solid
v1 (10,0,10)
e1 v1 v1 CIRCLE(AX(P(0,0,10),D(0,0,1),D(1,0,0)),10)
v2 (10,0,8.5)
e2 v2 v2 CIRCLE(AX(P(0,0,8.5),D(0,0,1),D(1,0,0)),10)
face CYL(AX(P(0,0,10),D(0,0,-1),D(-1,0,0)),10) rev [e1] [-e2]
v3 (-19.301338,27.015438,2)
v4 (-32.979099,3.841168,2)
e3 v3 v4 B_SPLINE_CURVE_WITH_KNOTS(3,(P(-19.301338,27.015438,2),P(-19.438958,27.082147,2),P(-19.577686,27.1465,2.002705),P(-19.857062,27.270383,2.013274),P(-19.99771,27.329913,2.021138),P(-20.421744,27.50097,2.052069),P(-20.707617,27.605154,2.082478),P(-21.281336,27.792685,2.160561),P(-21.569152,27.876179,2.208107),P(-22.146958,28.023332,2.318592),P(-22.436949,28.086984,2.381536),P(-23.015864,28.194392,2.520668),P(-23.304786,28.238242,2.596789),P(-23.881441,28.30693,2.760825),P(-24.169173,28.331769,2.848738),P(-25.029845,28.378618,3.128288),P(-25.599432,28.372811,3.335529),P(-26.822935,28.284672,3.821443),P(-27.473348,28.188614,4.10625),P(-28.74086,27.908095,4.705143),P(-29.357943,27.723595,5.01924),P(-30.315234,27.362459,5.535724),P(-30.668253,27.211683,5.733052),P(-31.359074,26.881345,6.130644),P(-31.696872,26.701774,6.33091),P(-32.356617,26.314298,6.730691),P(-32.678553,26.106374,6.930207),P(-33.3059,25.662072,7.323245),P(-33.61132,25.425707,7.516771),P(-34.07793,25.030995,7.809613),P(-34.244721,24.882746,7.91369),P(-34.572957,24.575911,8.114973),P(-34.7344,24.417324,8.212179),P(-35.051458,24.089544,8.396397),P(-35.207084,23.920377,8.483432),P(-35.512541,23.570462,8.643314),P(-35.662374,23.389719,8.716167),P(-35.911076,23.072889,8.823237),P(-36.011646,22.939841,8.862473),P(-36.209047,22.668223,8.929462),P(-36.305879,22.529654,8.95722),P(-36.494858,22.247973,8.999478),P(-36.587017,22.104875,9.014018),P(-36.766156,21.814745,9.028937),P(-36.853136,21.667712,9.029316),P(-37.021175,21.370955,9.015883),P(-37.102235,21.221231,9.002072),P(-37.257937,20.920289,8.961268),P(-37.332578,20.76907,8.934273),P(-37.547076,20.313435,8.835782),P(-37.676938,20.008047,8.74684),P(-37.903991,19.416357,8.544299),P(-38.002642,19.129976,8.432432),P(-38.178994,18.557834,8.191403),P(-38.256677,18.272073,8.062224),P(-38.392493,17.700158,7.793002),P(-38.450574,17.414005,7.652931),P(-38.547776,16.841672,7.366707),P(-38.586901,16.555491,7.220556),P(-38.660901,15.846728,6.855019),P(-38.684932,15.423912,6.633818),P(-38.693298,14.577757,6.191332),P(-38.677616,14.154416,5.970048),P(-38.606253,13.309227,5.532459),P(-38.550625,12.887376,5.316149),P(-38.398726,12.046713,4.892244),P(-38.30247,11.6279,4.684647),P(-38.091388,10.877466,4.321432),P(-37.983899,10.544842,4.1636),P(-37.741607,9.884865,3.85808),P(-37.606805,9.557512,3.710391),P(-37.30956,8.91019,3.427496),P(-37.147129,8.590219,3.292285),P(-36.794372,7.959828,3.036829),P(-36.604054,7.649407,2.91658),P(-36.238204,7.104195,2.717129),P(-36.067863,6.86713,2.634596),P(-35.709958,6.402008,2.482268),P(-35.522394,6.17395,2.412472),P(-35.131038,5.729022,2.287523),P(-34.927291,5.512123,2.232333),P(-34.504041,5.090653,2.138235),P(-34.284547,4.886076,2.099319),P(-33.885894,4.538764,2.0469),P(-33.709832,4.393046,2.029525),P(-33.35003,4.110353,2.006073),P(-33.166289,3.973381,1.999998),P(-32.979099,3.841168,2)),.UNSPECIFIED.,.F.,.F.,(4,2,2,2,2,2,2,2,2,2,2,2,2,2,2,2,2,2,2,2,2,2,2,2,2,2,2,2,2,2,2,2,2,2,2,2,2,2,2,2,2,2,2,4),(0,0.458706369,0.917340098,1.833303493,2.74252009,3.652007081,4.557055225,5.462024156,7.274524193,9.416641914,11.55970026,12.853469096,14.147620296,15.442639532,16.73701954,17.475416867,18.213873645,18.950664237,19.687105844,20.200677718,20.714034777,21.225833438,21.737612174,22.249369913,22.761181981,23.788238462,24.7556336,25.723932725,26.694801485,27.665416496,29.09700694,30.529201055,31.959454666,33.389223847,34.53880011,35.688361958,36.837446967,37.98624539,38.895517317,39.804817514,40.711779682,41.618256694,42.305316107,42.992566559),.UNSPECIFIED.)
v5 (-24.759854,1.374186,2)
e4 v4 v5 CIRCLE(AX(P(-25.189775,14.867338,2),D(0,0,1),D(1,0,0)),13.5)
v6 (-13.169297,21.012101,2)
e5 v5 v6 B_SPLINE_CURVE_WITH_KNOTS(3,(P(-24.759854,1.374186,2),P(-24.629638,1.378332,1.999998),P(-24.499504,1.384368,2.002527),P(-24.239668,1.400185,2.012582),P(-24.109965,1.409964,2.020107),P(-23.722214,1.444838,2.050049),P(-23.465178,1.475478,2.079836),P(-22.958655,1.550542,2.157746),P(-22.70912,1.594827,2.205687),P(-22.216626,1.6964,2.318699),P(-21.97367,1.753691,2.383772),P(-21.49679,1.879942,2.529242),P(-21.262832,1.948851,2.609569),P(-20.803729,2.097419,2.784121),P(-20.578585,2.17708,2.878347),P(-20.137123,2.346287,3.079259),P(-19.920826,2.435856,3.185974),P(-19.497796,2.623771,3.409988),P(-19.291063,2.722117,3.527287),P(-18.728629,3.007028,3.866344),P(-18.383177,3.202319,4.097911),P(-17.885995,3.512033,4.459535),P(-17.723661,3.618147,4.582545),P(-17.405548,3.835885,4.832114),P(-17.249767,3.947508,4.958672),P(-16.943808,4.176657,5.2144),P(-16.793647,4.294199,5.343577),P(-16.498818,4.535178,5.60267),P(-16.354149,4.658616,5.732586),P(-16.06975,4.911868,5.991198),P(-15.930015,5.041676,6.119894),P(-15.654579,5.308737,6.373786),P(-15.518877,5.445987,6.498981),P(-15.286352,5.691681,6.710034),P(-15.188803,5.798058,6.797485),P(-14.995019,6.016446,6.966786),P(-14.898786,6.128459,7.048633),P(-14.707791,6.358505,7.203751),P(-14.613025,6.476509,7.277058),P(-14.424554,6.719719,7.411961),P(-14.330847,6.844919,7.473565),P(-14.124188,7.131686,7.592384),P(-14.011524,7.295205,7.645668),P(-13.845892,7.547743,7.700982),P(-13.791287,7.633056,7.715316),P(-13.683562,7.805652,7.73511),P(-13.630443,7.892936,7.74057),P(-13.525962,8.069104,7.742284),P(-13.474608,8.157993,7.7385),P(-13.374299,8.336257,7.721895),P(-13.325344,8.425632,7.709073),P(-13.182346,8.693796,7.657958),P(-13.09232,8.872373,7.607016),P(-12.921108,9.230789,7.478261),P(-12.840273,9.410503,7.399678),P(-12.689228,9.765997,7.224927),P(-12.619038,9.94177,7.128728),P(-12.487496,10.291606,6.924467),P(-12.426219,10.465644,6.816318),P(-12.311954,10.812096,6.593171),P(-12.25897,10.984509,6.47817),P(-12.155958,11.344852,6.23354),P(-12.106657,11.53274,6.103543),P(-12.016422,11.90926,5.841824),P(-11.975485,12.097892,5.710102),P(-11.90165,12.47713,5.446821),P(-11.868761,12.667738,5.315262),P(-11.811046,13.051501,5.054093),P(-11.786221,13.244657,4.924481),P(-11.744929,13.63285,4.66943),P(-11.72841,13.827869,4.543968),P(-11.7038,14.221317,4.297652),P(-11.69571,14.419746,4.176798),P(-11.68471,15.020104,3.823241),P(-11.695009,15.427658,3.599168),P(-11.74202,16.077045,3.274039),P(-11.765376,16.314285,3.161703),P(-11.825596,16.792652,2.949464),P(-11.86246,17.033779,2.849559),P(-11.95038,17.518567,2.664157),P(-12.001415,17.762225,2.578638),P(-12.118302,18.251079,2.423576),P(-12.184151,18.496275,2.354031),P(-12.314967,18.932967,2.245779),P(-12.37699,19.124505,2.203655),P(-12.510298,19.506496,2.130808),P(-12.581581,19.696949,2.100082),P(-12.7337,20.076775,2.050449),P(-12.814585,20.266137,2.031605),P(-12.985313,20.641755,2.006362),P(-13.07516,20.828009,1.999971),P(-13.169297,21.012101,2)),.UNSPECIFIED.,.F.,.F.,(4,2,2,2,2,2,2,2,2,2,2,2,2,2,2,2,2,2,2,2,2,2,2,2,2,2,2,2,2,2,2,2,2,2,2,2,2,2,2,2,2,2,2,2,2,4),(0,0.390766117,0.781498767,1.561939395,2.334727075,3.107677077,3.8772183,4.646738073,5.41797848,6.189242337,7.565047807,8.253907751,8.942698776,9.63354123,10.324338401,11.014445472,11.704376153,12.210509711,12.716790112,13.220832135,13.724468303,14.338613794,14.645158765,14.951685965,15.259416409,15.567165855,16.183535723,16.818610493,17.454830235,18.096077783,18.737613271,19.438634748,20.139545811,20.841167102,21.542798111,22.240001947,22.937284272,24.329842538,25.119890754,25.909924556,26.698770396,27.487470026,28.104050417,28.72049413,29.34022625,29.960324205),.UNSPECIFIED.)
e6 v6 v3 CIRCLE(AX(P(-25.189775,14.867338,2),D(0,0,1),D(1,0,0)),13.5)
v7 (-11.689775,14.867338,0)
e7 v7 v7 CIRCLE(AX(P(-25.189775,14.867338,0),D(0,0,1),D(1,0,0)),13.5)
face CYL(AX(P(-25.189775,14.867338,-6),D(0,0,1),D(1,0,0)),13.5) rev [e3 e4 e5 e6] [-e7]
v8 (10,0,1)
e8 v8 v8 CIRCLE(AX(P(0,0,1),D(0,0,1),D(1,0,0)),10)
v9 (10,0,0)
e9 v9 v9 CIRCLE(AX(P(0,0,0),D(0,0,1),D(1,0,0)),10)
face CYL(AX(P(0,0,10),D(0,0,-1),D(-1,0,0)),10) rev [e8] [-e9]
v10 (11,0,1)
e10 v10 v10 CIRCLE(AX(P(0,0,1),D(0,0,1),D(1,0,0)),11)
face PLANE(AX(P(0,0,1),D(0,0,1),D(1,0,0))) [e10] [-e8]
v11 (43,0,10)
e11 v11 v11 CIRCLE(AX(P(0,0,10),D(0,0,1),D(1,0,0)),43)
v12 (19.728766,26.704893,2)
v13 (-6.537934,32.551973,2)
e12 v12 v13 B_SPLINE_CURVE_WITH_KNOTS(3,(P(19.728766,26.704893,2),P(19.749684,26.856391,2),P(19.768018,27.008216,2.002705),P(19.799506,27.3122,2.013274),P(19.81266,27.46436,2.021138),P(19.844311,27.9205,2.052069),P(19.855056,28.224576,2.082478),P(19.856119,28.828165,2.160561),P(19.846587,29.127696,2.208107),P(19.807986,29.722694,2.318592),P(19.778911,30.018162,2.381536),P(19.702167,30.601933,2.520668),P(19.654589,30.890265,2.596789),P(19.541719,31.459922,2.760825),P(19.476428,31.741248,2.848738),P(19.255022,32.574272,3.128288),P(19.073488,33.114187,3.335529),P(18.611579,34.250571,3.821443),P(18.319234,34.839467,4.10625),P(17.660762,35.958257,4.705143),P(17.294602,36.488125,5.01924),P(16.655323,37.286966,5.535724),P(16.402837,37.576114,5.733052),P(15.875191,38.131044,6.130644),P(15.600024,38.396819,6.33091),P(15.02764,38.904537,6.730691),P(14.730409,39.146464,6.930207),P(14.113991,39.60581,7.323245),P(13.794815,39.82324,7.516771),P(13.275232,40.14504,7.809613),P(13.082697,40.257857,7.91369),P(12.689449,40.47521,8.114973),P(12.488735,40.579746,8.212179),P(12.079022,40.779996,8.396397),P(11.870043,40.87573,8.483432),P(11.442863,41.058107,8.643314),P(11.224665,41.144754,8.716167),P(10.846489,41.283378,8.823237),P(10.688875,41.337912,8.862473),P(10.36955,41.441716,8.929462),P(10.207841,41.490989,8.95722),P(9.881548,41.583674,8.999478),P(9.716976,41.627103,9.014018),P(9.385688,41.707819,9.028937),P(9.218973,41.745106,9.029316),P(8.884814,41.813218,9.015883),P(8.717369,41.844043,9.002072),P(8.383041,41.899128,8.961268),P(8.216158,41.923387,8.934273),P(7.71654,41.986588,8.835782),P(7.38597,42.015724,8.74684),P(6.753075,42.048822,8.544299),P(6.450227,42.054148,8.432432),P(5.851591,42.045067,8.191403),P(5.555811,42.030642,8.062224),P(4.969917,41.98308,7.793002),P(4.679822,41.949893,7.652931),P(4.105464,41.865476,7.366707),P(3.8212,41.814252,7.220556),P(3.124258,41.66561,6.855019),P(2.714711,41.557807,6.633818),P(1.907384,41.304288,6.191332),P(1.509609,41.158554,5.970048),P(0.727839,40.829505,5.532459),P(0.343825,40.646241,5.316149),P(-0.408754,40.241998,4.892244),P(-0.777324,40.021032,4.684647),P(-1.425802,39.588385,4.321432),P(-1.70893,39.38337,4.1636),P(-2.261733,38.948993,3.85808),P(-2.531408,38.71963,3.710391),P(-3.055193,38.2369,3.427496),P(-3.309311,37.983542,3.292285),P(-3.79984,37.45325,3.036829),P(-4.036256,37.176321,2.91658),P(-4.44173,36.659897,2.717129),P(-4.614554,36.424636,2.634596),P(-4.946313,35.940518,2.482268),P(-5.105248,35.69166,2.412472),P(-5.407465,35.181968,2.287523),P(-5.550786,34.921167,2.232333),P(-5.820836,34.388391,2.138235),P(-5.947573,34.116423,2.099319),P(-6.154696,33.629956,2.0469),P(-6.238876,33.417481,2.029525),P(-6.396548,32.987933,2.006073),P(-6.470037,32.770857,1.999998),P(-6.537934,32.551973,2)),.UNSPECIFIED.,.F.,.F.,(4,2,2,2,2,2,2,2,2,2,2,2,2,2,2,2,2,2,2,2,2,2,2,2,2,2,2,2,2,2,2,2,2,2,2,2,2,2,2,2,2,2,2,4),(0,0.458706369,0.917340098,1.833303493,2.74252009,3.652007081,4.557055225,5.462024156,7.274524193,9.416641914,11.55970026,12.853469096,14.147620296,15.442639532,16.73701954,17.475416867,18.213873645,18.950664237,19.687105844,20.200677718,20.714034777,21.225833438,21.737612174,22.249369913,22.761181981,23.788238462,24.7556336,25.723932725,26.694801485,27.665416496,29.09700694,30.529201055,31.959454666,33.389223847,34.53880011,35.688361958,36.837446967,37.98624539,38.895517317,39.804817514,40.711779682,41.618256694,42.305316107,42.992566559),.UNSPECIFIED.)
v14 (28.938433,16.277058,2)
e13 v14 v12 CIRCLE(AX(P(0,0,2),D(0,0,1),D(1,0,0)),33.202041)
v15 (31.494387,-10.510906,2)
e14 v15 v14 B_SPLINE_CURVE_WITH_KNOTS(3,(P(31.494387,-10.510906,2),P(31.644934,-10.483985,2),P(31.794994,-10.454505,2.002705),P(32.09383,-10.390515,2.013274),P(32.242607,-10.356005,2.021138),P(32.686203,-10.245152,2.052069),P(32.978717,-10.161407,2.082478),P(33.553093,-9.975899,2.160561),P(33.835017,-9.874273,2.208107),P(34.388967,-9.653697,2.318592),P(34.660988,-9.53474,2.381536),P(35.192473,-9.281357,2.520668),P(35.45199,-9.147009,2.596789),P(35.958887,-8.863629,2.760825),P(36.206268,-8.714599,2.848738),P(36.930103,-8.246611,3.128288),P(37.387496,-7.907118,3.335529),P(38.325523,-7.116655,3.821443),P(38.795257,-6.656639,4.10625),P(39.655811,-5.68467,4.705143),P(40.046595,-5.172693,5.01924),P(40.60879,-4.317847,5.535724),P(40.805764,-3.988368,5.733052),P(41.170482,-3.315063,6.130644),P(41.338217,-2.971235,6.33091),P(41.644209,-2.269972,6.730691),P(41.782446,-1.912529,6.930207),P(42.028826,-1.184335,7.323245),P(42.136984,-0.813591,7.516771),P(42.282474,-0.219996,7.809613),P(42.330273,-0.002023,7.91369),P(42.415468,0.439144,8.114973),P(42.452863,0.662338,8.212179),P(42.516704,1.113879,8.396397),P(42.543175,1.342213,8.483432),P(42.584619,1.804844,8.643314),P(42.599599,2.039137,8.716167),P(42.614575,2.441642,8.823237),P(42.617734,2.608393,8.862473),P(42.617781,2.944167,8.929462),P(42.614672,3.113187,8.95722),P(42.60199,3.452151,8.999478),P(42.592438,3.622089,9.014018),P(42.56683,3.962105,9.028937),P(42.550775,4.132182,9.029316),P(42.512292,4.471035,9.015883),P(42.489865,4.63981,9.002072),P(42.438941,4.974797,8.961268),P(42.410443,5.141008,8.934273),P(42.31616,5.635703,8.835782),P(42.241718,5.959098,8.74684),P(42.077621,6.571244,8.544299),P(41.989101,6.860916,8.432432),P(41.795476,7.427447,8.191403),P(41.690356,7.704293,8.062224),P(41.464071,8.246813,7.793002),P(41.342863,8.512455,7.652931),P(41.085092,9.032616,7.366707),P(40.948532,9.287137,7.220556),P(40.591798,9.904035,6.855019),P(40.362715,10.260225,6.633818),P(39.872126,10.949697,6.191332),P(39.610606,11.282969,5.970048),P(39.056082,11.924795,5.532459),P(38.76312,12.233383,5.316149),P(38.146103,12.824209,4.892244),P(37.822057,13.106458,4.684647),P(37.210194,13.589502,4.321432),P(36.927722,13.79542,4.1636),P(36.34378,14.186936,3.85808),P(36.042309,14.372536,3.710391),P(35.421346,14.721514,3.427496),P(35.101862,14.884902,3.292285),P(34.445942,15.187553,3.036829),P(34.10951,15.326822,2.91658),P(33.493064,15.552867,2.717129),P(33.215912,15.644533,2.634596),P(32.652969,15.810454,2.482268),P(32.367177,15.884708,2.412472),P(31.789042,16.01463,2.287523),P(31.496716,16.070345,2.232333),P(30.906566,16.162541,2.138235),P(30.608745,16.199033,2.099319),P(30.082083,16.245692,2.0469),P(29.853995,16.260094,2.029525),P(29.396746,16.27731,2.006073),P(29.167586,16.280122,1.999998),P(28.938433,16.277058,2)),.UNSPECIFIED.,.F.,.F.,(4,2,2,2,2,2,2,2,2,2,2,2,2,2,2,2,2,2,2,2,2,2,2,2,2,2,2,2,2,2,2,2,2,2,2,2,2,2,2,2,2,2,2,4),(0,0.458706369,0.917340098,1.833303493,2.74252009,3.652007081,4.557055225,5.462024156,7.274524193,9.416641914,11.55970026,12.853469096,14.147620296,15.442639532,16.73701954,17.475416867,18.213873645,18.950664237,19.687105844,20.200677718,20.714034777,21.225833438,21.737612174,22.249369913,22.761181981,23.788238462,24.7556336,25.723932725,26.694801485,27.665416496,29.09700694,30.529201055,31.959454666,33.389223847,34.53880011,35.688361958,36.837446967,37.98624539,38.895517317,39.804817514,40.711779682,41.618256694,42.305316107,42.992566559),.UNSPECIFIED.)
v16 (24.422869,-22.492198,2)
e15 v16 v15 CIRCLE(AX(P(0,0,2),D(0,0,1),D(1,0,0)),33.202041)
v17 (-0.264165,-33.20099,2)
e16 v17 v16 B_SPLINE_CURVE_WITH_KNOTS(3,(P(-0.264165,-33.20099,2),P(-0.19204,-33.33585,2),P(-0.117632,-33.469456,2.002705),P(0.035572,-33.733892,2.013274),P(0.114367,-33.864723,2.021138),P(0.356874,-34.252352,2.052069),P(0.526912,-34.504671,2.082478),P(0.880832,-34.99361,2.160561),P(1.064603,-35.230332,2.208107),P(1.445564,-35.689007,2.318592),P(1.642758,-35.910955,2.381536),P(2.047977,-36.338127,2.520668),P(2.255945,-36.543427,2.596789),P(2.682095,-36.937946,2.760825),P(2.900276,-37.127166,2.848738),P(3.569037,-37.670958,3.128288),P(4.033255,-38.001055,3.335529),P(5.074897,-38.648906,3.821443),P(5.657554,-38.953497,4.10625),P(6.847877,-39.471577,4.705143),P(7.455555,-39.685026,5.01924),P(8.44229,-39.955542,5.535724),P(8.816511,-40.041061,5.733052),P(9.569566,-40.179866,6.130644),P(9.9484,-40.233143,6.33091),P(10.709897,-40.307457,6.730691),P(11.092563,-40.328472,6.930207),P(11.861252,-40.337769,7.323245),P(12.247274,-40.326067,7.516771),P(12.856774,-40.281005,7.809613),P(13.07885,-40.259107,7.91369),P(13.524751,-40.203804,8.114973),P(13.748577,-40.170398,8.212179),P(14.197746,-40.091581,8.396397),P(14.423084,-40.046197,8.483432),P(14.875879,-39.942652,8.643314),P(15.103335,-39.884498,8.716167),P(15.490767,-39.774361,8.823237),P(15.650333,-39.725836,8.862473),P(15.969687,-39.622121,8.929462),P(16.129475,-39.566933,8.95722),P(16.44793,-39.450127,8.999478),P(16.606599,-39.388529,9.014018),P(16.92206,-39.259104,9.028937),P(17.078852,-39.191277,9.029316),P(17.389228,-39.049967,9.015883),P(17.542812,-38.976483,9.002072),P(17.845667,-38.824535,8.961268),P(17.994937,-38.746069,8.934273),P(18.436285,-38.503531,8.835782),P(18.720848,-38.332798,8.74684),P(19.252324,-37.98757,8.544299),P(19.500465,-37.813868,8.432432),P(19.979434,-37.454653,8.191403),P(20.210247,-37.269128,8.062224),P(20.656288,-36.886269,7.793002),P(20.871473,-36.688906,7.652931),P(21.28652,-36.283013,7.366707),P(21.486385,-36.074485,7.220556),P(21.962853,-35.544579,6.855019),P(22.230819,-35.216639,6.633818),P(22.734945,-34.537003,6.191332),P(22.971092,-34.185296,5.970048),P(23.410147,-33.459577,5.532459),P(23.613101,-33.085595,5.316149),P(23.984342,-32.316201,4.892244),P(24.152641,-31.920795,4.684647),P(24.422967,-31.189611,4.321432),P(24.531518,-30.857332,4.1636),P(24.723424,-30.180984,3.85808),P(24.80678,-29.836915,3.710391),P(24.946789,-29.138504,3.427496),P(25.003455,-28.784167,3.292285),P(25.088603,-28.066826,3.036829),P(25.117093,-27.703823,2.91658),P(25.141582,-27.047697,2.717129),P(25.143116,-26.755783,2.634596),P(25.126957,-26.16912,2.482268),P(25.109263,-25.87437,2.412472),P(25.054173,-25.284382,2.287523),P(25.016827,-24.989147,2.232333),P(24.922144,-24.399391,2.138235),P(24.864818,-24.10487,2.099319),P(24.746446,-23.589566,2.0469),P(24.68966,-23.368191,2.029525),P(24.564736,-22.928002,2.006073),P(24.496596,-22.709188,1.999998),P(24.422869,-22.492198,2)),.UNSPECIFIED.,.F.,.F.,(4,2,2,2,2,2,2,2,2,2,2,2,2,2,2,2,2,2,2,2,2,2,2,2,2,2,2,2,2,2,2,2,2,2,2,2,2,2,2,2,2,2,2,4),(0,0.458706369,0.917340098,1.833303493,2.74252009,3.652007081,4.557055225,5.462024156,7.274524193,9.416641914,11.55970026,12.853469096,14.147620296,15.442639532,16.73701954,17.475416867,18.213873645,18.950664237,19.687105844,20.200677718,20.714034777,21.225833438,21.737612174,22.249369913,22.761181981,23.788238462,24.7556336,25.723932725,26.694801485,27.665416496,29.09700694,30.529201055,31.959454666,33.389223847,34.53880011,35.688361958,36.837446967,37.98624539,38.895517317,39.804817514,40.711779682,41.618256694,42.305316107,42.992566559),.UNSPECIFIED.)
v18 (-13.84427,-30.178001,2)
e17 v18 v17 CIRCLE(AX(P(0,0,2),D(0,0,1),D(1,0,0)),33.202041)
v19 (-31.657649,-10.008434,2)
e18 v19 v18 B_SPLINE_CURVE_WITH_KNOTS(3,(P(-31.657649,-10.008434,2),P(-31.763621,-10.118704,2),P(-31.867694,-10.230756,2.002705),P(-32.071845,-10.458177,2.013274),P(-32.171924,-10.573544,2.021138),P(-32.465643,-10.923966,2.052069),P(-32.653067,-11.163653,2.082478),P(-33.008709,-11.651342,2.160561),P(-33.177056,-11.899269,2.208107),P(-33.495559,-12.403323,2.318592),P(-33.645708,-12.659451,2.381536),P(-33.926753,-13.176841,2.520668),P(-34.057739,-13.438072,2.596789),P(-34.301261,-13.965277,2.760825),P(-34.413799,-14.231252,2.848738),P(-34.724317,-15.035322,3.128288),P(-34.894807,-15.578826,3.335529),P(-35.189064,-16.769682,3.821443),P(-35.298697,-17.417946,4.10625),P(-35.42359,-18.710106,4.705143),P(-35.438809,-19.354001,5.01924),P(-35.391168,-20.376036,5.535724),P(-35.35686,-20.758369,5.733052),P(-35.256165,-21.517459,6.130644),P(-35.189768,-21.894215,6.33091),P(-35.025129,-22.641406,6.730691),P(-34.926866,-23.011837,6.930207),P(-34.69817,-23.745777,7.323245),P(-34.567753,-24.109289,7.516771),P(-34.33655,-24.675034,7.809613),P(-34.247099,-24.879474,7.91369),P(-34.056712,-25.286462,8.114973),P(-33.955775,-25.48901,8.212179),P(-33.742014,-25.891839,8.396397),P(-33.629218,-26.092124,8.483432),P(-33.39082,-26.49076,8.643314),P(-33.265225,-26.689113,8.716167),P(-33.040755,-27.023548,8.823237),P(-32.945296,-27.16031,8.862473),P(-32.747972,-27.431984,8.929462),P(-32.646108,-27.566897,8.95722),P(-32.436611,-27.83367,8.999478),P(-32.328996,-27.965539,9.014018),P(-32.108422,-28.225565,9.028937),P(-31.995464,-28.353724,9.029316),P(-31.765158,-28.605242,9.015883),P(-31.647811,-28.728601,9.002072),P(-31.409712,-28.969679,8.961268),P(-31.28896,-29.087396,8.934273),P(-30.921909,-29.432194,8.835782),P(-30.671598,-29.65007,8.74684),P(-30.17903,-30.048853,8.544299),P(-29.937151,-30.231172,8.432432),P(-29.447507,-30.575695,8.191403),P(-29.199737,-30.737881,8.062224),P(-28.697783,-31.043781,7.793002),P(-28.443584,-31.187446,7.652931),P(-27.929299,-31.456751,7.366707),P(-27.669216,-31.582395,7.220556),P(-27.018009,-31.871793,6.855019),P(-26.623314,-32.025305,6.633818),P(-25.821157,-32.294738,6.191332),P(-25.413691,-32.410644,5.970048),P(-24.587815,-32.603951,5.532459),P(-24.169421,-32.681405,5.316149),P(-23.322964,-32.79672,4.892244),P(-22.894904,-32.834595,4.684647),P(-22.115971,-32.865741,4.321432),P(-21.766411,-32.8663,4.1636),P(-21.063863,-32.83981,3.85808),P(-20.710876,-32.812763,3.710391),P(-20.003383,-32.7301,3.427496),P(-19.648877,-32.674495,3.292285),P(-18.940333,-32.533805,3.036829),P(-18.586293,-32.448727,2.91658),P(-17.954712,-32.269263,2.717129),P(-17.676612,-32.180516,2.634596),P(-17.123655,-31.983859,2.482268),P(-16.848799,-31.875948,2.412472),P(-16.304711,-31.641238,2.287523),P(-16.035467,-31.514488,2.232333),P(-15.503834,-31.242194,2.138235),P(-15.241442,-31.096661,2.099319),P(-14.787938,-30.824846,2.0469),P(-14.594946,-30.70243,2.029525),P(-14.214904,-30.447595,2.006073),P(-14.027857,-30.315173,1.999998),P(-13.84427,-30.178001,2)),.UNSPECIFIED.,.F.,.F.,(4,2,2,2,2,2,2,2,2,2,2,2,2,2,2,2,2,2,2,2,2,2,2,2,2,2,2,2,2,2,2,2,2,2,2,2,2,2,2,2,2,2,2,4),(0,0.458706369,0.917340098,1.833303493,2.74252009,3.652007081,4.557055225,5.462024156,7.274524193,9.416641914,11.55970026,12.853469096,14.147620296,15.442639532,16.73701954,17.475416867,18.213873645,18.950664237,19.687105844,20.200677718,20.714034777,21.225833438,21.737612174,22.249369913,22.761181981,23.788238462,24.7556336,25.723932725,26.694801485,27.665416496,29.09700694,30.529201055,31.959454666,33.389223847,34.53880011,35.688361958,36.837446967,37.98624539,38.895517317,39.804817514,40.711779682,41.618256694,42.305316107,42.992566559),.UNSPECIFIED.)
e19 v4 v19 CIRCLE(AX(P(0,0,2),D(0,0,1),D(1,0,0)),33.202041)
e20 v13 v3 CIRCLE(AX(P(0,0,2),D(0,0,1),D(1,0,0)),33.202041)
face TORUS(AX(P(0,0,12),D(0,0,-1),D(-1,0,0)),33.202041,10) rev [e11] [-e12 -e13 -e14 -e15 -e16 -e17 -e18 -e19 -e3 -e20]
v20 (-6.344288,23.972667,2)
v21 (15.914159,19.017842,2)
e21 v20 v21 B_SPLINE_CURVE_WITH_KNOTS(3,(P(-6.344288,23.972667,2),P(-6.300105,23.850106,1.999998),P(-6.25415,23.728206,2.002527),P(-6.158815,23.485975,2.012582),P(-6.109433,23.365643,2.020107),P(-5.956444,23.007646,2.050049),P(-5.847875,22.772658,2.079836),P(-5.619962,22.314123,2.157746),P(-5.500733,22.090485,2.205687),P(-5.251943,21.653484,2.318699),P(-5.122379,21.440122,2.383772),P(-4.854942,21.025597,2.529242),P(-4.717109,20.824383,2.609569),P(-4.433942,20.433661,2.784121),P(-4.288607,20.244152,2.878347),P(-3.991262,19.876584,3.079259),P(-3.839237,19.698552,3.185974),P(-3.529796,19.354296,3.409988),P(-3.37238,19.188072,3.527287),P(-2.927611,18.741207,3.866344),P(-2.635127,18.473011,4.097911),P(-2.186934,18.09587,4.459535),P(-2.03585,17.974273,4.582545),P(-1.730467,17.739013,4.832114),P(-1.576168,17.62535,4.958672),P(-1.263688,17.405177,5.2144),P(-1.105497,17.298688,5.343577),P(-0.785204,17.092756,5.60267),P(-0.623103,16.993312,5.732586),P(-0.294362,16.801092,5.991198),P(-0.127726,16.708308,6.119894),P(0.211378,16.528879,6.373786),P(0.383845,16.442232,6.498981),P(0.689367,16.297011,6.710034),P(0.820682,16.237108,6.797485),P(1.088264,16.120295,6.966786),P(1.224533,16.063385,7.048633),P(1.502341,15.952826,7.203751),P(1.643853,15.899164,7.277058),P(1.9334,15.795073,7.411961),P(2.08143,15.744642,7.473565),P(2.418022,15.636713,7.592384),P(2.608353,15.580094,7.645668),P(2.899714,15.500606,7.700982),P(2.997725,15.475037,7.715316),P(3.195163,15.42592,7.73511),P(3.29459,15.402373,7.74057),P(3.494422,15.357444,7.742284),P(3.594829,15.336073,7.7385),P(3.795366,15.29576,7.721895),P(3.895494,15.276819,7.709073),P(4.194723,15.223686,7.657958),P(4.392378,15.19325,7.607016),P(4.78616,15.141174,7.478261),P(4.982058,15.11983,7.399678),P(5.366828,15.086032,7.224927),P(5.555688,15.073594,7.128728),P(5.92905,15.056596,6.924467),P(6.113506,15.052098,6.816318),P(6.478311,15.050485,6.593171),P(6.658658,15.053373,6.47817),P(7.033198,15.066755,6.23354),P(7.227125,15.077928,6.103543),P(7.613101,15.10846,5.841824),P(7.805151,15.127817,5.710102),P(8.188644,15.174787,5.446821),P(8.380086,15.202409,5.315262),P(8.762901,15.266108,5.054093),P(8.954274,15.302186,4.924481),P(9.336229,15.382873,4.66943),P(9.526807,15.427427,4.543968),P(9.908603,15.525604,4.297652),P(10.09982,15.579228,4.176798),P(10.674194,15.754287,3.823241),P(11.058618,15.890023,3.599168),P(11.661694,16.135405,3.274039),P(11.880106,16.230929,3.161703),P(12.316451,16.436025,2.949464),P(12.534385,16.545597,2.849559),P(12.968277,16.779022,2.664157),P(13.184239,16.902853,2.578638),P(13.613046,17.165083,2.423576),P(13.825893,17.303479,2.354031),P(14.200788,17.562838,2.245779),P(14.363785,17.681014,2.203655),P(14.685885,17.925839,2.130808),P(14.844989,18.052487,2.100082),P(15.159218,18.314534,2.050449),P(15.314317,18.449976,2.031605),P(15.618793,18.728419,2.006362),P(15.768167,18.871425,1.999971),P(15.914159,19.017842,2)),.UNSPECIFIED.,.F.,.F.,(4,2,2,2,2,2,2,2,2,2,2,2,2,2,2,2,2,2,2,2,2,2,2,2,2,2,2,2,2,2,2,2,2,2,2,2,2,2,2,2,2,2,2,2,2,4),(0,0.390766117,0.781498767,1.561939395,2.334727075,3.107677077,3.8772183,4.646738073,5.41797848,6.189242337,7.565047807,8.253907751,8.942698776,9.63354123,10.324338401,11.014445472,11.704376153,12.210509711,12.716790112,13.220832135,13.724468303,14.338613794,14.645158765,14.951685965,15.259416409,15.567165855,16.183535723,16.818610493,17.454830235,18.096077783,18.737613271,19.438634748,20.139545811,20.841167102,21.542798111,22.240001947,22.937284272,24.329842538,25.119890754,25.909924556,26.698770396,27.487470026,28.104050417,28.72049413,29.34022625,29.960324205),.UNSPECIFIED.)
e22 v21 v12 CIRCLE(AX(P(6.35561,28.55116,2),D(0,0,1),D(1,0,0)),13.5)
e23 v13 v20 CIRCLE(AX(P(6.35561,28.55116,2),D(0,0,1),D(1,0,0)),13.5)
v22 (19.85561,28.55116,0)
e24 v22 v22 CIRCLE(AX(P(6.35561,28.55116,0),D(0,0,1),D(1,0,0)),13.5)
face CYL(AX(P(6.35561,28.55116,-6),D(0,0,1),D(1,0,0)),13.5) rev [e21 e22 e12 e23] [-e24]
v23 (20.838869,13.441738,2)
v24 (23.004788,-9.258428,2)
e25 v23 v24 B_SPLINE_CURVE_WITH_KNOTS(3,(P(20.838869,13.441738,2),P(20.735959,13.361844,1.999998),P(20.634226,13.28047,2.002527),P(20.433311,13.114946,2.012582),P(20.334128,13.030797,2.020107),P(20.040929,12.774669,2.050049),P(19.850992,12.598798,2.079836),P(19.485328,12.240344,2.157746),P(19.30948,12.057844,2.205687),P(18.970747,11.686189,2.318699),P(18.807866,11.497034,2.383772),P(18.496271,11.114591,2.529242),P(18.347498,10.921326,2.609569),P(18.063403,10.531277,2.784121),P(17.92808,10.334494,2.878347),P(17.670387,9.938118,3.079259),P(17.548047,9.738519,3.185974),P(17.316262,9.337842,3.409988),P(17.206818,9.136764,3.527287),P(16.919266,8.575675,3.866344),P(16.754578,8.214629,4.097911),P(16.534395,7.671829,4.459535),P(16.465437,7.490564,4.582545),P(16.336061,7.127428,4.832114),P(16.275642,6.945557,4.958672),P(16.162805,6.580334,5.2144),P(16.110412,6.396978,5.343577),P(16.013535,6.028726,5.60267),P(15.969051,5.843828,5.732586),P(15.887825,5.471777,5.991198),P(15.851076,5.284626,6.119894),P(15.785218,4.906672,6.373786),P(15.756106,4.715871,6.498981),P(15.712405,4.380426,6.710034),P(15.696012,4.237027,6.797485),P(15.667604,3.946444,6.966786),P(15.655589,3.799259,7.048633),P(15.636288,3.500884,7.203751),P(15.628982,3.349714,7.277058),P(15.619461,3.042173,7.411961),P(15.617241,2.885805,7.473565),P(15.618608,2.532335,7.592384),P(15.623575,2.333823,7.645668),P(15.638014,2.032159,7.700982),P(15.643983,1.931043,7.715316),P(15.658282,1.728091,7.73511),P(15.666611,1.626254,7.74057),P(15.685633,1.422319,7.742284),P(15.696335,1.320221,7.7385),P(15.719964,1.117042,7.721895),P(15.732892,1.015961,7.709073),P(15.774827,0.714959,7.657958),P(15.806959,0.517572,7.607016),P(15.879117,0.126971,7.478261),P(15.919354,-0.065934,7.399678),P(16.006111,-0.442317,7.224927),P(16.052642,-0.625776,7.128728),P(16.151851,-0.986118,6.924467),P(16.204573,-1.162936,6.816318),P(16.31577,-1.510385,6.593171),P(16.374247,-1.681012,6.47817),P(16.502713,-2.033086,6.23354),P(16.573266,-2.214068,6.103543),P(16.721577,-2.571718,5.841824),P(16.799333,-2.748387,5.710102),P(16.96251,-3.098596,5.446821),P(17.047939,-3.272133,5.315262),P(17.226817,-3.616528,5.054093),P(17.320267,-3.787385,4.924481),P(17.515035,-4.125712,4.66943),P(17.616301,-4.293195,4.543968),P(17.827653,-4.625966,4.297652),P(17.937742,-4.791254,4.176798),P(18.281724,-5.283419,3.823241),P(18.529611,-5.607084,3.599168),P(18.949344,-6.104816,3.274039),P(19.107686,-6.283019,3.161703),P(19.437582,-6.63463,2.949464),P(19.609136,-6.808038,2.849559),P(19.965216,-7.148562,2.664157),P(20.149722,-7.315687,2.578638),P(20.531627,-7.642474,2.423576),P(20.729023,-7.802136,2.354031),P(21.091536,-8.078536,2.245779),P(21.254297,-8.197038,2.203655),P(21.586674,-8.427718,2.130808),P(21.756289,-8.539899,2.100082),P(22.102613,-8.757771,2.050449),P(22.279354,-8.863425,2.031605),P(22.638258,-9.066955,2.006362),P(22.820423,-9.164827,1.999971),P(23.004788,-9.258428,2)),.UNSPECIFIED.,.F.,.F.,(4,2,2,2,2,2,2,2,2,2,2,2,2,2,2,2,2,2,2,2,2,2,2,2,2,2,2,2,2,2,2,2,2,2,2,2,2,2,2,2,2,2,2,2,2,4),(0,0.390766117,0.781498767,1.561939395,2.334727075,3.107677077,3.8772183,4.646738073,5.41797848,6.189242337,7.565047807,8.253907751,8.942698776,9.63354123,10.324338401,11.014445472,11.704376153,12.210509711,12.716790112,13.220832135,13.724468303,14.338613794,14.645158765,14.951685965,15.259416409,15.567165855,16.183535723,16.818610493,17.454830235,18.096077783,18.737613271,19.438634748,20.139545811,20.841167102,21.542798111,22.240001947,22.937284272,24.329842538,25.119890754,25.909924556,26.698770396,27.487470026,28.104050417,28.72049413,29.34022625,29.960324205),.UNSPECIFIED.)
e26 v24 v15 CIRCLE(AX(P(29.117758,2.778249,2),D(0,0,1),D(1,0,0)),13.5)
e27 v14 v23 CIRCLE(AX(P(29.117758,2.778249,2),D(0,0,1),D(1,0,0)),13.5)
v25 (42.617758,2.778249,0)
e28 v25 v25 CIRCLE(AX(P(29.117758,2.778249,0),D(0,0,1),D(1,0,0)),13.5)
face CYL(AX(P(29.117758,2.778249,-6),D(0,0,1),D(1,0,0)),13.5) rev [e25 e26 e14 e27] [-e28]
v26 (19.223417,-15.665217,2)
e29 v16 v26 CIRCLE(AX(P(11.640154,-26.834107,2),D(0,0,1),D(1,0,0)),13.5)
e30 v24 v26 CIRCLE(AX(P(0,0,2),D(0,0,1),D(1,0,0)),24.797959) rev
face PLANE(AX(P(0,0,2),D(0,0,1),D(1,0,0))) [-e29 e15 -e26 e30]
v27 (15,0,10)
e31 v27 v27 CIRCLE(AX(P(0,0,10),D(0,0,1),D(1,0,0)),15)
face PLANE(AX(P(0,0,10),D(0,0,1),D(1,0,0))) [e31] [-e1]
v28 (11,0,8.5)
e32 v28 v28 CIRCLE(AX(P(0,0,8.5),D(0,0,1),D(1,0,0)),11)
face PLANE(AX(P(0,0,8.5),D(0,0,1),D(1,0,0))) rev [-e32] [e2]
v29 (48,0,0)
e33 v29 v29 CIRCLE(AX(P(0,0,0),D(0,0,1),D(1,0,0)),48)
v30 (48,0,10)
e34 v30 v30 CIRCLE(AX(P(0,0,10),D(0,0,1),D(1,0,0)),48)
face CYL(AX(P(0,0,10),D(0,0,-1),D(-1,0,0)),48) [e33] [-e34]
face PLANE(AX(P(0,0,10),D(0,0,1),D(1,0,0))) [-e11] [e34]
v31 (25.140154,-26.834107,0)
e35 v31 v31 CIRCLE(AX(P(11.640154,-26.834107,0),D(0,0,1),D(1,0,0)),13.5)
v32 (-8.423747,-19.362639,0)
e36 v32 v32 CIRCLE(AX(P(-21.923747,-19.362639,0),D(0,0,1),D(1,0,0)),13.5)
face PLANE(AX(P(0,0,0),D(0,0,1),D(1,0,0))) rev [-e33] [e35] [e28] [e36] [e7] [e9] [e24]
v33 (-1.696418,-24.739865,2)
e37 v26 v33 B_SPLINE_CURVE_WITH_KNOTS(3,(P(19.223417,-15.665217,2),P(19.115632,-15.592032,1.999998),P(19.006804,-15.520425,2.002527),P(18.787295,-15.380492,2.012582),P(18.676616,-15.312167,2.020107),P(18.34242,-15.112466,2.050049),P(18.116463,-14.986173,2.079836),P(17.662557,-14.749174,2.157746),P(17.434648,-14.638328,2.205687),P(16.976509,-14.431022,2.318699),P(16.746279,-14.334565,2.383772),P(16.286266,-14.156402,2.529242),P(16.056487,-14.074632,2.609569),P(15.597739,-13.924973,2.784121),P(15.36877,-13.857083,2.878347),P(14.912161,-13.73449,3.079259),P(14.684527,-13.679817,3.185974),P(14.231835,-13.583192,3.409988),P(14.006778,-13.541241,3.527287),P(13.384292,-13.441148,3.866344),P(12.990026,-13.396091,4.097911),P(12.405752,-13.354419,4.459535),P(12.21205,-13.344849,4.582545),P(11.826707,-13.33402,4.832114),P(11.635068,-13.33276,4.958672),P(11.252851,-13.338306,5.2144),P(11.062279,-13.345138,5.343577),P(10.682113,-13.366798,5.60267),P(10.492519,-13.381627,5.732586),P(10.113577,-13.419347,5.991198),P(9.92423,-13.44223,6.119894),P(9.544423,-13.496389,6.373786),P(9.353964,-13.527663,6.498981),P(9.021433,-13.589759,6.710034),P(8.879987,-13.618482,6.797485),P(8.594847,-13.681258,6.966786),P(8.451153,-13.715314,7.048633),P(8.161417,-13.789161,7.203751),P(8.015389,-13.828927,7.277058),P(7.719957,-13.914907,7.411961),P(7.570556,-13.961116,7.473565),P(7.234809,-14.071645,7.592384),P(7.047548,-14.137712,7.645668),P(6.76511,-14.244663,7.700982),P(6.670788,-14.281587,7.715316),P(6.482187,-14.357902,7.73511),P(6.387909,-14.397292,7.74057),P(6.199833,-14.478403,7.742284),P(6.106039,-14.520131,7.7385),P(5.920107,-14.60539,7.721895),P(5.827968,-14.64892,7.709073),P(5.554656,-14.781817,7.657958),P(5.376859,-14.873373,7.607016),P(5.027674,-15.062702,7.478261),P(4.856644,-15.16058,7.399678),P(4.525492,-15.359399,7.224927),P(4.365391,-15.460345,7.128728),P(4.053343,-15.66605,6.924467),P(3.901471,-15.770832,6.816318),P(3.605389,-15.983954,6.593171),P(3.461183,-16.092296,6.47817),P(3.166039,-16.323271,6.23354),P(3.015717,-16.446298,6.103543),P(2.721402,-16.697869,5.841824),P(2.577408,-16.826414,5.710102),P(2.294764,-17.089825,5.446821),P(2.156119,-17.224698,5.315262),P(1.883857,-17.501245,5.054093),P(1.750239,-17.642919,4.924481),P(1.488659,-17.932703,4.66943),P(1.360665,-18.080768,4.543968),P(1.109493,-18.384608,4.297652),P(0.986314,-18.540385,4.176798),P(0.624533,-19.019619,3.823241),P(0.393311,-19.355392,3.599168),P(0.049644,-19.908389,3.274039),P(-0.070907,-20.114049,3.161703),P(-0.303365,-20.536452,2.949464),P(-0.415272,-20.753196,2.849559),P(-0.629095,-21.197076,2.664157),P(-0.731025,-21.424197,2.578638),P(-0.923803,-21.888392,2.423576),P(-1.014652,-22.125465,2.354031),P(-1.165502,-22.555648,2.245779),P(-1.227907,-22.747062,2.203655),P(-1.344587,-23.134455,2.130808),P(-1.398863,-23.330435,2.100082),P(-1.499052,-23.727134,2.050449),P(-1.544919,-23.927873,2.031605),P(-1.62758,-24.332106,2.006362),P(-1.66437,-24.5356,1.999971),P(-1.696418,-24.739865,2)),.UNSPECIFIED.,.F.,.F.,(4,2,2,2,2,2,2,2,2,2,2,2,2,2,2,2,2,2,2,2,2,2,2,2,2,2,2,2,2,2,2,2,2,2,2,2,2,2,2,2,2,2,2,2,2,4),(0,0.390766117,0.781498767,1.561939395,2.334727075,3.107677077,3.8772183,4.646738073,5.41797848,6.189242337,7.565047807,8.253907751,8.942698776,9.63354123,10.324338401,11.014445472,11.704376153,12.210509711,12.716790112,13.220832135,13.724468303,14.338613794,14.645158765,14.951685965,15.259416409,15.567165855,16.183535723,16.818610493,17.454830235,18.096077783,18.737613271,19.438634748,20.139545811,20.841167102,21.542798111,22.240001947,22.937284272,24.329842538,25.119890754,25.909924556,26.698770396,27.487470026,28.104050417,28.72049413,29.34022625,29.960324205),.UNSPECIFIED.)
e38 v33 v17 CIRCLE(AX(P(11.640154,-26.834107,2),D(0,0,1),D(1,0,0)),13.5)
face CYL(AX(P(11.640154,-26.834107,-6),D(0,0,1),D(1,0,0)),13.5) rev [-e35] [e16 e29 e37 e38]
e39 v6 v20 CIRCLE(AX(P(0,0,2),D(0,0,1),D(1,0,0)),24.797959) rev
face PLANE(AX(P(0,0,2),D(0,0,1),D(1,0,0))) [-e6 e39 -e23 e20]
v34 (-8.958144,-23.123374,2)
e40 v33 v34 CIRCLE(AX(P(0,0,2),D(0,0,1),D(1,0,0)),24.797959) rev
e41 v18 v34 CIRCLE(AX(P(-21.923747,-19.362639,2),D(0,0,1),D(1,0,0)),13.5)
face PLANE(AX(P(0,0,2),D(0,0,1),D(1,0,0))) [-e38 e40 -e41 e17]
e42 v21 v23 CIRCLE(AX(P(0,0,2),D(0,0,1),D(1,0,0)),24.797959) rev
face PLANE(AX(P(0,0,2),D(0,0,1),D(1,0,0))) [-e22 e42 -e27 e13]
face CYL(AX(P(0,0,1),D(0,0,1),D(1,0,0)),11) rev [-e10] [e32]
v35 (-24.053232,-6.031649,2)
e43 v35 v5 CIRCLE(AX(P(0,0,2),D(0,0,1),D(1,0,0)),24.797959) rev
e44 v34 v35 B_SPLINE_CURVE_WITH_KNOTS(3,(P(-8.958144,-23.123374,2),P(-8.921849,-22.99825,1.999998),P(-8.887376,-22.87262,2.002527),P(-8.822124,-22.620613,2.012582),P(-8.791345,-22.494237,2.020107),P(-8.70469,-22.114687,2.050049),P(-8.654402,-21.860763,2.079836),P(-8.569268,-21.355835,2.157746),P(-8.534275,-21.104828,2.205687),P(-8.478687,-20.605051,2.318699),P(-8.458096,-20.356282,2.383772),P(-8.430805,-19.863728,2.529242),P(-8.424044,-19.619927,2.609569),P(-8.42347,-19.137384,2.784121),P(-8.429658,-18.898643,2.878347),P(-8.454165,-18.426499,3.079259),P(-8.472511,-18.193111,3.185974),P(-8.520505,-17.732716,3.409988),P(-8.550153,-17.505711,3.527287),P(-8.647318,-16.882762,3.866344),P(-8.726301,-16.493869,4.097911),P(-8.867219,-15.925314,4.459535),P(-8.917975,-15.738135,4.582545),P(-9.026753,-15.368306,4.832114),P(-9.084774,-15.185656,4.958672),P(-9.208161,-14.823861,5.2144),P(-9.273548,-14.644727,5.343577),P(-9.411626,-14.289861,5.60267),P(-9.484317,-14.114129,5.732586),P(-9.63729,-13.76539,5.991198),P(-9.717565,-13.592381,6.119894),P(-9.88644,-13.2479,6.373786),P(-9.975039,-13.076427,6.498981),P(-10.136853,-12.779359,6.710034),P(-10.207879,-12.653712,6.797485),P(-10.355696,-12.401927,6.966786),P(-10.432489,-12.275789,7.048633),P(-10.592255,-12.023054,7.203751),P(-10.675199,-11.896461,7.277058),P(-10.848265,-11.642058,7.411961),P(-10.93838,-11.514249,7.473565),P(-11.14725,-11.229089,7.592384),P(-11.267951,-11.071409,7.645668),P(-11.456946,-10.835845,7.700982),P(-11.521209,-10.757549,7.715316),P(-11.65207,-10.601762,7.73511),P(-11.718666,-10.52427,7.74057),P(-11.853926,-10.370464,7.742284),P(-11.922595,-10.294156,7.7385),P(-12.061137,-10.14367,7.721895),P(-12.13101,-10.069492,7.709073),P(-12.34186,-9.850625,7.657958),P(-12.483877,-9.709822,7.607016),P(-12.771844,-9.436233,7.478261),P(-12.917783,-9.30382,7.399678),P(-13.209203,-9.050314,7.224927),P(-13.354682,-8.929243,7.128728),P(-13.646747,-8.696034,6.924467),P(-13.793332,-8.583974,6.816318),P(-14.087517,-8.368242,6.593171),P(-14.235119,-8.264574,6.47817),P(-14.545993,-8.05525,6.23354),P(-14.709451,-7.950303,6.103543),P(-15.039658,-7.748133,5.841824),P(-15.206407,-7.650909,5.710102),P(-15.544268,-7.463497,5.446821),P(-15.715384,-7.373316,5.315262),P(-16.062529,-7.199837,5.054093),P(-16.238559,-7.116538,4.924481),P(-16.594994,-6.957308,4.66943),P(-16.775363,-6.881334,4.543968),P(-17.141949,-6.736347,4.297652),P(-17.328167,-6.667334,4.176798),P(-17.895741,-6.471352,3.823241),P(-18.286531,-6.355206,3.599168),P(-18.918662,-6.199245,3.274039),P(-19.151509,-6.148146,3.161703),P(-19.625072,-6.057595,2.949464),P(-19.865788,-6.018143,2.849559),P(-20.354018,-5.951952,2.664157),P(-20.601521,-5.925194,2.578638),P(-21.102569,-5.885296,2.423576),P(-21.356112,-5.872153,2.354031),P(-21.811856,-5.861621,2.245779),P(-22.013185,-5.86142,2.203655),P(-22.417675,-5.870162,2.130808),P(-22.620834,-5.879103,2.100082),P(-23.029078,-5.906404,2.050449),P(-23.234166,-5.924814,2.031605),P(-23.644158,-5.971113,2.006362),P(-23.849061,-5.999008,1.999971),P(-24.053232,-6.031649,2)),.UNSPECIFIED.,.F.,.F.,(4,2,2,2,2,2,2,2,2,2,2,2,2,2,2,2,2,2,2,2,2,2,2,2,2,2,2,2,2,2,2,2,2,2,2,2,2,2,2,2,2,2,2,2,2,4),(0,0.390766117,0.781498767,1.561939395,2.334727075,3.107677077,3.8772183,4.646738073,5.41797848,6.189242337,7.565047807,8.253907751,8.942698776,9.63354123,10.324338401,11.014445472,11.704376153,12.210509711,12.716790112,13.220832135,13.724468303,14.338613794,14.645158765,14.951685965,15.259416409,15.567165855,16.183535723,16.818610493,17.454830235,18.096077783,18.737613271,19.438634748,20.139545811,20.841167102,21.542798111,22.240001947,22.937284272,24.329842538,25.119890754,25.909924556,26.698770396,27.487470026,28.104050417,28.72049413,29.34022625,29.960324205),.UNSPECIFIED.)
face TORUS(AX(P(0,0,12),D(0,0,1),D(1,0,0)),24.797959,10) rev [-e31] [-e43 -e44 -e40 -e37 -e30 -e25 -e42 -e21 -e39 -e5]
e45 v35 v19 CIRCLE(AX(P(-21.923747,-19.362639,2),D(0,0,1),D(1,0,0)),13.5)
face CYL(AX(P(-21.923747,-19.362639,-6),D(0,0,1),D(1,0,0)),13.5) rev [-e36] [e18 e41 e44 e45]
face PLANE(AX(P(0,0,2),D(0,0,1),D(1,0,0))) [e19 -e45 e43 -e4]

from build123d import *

# Parameters (mm, degrees)
SKETCH1_R           = 48
SKETCH1_R_2         = 10
BOSS_EXTRUDE1_DEPTH = 10
CUT_EXTRUDE1_START  = -1.5
SKETCH2_R           = 11
CUT_EXTRUDE1_DEPTH  = 7.5
SKETCH3_R           = 43
SKETCH3_R_2         = 15
CUT_EXTRUDE2_DEPTH  = 8
SKETCH4_R           = 13.5
CUT_EXTRUDE3_DEPTH  = 8
FILLET1_START       = 2
FILLET1_OUTLINE_R   = 43
FILLET1_OUTLINE_R_2 = 13.5
FILLET1_OUTLINE_R_3 = 15
FILLET1_DEPTH       = 8.0000001


with BuildPart() as part:
    # Sketch1 → Boss-Extrude1 (new body)
    with BuildSketch(Plane.XY):
        Circle(SKETCH1_R)
        Circle(SKETCH1_R_2, mode=Mode.SUBTRACT)
    extrude(amount=BOSS_EXTRUDE1_DEPTH)

    # Sketch2 → Cut-Extrude1 (cut)
    with BuildSketch(Plane.XY.offset(10).offset(CUT_EXTRUDE1_START)):
        Circle(SKETCH2_R)
    extrude(amount=-CUT_EXTRUDE1_DEPTH, mode=Mode.SUBTRACT)

    # Sketch3 → Cut-Extrude2 (cut)
    with BuildSketch(Plane.XY.offset(10)):
        Circle(SKETCH3_R)
        Circle(SKETCH3_R_2, mode=Mode.SUBTRACT)
    extrude(amount=-CUT_EXTRUDE2_DEPTH, mode=Mode.SUBTRACT)

    # Sketch4 → Cut-Extrude3 (cut)
    with BuildSketch(Plane.XY.offset(2)):
        with Locations((-21.923747427, -19.362639251)):
            Circle(SKETCH4_R)
        with Locations((-25.189774768, 14.867338267)):
            Circle(SKETCH4_R)
        with Locations((6.355610451, 28.551159623)):
            Circle(SKETCH4_R)
        with Locations((29.117758046, 2.778248798)):
            Circle(SKETCH4_R)
        with Locations((11.640153697, -26.834107436)):
            Circle(SKETCH4_R)
    extrude(amount=-CUT_EXTRUDE3_DEPTH, mode=Mode.SUBTRACT)

    # Fillet1: read off the stored shape, not the designer's step
    # Fillet1 outline → Fillet1 (add)
    with BuildSketch(Plane.XY.offset(FILLET1_START)):
        Circle(FILLET1_OUTLINE_R)
        with Locations((-21.923747427, -19.362639251)):
            Circle(FILLET1_OUTLINE_R_2, mode=Mode.SUBTRACT)
        with Locations((11.640153697, -26.834107436)):
            Circle(FILLET1_OUTLINE_R_2, mode=Mode.SUBTRACT)
        with Locations((-25.189774768, 14.867338267)):
            Circle(FILLET1_OUTLINE_R_2, mode=Mode.SUBTRACT)
        Circle(FILLET1_OUTLINE_R_3, mode=Mode.SUBTRACT)
        with Locations((29.117758046, 2.778248798)):
            Circle(FILLET1_OUTLINE_R_2, mode=Mode.SUBTRACT)
        with Locations((6.355610451, 28.551159623)):
            Circle(FILLET1_OUTLINE_R_2, mode=Mode.SUBTRACT)
    extrude(amount=FILLET1_DEPTH)

    # Fillet1 2 outline → Fillet1 2 (revolve, cut)
    with BuildSketch(Plane.XZ):
        with BuildLine():
            ThreePointArc((15, 10), (18.473403651, 4.254033308), (24.797958971, 2))
            Line((24.797958971, 2), (33.202041029, 2))
            ThreePointArc((33.202041029, 2), (39.526596349, 4.254033308), (43, 10))
            Line((43, 10), (15, 10))
        make_face()
    revolve(axis=Axis((0, 0, 0), (0, 0, 1)), mode=Mode.SUBTRACT)


solid = part.part
